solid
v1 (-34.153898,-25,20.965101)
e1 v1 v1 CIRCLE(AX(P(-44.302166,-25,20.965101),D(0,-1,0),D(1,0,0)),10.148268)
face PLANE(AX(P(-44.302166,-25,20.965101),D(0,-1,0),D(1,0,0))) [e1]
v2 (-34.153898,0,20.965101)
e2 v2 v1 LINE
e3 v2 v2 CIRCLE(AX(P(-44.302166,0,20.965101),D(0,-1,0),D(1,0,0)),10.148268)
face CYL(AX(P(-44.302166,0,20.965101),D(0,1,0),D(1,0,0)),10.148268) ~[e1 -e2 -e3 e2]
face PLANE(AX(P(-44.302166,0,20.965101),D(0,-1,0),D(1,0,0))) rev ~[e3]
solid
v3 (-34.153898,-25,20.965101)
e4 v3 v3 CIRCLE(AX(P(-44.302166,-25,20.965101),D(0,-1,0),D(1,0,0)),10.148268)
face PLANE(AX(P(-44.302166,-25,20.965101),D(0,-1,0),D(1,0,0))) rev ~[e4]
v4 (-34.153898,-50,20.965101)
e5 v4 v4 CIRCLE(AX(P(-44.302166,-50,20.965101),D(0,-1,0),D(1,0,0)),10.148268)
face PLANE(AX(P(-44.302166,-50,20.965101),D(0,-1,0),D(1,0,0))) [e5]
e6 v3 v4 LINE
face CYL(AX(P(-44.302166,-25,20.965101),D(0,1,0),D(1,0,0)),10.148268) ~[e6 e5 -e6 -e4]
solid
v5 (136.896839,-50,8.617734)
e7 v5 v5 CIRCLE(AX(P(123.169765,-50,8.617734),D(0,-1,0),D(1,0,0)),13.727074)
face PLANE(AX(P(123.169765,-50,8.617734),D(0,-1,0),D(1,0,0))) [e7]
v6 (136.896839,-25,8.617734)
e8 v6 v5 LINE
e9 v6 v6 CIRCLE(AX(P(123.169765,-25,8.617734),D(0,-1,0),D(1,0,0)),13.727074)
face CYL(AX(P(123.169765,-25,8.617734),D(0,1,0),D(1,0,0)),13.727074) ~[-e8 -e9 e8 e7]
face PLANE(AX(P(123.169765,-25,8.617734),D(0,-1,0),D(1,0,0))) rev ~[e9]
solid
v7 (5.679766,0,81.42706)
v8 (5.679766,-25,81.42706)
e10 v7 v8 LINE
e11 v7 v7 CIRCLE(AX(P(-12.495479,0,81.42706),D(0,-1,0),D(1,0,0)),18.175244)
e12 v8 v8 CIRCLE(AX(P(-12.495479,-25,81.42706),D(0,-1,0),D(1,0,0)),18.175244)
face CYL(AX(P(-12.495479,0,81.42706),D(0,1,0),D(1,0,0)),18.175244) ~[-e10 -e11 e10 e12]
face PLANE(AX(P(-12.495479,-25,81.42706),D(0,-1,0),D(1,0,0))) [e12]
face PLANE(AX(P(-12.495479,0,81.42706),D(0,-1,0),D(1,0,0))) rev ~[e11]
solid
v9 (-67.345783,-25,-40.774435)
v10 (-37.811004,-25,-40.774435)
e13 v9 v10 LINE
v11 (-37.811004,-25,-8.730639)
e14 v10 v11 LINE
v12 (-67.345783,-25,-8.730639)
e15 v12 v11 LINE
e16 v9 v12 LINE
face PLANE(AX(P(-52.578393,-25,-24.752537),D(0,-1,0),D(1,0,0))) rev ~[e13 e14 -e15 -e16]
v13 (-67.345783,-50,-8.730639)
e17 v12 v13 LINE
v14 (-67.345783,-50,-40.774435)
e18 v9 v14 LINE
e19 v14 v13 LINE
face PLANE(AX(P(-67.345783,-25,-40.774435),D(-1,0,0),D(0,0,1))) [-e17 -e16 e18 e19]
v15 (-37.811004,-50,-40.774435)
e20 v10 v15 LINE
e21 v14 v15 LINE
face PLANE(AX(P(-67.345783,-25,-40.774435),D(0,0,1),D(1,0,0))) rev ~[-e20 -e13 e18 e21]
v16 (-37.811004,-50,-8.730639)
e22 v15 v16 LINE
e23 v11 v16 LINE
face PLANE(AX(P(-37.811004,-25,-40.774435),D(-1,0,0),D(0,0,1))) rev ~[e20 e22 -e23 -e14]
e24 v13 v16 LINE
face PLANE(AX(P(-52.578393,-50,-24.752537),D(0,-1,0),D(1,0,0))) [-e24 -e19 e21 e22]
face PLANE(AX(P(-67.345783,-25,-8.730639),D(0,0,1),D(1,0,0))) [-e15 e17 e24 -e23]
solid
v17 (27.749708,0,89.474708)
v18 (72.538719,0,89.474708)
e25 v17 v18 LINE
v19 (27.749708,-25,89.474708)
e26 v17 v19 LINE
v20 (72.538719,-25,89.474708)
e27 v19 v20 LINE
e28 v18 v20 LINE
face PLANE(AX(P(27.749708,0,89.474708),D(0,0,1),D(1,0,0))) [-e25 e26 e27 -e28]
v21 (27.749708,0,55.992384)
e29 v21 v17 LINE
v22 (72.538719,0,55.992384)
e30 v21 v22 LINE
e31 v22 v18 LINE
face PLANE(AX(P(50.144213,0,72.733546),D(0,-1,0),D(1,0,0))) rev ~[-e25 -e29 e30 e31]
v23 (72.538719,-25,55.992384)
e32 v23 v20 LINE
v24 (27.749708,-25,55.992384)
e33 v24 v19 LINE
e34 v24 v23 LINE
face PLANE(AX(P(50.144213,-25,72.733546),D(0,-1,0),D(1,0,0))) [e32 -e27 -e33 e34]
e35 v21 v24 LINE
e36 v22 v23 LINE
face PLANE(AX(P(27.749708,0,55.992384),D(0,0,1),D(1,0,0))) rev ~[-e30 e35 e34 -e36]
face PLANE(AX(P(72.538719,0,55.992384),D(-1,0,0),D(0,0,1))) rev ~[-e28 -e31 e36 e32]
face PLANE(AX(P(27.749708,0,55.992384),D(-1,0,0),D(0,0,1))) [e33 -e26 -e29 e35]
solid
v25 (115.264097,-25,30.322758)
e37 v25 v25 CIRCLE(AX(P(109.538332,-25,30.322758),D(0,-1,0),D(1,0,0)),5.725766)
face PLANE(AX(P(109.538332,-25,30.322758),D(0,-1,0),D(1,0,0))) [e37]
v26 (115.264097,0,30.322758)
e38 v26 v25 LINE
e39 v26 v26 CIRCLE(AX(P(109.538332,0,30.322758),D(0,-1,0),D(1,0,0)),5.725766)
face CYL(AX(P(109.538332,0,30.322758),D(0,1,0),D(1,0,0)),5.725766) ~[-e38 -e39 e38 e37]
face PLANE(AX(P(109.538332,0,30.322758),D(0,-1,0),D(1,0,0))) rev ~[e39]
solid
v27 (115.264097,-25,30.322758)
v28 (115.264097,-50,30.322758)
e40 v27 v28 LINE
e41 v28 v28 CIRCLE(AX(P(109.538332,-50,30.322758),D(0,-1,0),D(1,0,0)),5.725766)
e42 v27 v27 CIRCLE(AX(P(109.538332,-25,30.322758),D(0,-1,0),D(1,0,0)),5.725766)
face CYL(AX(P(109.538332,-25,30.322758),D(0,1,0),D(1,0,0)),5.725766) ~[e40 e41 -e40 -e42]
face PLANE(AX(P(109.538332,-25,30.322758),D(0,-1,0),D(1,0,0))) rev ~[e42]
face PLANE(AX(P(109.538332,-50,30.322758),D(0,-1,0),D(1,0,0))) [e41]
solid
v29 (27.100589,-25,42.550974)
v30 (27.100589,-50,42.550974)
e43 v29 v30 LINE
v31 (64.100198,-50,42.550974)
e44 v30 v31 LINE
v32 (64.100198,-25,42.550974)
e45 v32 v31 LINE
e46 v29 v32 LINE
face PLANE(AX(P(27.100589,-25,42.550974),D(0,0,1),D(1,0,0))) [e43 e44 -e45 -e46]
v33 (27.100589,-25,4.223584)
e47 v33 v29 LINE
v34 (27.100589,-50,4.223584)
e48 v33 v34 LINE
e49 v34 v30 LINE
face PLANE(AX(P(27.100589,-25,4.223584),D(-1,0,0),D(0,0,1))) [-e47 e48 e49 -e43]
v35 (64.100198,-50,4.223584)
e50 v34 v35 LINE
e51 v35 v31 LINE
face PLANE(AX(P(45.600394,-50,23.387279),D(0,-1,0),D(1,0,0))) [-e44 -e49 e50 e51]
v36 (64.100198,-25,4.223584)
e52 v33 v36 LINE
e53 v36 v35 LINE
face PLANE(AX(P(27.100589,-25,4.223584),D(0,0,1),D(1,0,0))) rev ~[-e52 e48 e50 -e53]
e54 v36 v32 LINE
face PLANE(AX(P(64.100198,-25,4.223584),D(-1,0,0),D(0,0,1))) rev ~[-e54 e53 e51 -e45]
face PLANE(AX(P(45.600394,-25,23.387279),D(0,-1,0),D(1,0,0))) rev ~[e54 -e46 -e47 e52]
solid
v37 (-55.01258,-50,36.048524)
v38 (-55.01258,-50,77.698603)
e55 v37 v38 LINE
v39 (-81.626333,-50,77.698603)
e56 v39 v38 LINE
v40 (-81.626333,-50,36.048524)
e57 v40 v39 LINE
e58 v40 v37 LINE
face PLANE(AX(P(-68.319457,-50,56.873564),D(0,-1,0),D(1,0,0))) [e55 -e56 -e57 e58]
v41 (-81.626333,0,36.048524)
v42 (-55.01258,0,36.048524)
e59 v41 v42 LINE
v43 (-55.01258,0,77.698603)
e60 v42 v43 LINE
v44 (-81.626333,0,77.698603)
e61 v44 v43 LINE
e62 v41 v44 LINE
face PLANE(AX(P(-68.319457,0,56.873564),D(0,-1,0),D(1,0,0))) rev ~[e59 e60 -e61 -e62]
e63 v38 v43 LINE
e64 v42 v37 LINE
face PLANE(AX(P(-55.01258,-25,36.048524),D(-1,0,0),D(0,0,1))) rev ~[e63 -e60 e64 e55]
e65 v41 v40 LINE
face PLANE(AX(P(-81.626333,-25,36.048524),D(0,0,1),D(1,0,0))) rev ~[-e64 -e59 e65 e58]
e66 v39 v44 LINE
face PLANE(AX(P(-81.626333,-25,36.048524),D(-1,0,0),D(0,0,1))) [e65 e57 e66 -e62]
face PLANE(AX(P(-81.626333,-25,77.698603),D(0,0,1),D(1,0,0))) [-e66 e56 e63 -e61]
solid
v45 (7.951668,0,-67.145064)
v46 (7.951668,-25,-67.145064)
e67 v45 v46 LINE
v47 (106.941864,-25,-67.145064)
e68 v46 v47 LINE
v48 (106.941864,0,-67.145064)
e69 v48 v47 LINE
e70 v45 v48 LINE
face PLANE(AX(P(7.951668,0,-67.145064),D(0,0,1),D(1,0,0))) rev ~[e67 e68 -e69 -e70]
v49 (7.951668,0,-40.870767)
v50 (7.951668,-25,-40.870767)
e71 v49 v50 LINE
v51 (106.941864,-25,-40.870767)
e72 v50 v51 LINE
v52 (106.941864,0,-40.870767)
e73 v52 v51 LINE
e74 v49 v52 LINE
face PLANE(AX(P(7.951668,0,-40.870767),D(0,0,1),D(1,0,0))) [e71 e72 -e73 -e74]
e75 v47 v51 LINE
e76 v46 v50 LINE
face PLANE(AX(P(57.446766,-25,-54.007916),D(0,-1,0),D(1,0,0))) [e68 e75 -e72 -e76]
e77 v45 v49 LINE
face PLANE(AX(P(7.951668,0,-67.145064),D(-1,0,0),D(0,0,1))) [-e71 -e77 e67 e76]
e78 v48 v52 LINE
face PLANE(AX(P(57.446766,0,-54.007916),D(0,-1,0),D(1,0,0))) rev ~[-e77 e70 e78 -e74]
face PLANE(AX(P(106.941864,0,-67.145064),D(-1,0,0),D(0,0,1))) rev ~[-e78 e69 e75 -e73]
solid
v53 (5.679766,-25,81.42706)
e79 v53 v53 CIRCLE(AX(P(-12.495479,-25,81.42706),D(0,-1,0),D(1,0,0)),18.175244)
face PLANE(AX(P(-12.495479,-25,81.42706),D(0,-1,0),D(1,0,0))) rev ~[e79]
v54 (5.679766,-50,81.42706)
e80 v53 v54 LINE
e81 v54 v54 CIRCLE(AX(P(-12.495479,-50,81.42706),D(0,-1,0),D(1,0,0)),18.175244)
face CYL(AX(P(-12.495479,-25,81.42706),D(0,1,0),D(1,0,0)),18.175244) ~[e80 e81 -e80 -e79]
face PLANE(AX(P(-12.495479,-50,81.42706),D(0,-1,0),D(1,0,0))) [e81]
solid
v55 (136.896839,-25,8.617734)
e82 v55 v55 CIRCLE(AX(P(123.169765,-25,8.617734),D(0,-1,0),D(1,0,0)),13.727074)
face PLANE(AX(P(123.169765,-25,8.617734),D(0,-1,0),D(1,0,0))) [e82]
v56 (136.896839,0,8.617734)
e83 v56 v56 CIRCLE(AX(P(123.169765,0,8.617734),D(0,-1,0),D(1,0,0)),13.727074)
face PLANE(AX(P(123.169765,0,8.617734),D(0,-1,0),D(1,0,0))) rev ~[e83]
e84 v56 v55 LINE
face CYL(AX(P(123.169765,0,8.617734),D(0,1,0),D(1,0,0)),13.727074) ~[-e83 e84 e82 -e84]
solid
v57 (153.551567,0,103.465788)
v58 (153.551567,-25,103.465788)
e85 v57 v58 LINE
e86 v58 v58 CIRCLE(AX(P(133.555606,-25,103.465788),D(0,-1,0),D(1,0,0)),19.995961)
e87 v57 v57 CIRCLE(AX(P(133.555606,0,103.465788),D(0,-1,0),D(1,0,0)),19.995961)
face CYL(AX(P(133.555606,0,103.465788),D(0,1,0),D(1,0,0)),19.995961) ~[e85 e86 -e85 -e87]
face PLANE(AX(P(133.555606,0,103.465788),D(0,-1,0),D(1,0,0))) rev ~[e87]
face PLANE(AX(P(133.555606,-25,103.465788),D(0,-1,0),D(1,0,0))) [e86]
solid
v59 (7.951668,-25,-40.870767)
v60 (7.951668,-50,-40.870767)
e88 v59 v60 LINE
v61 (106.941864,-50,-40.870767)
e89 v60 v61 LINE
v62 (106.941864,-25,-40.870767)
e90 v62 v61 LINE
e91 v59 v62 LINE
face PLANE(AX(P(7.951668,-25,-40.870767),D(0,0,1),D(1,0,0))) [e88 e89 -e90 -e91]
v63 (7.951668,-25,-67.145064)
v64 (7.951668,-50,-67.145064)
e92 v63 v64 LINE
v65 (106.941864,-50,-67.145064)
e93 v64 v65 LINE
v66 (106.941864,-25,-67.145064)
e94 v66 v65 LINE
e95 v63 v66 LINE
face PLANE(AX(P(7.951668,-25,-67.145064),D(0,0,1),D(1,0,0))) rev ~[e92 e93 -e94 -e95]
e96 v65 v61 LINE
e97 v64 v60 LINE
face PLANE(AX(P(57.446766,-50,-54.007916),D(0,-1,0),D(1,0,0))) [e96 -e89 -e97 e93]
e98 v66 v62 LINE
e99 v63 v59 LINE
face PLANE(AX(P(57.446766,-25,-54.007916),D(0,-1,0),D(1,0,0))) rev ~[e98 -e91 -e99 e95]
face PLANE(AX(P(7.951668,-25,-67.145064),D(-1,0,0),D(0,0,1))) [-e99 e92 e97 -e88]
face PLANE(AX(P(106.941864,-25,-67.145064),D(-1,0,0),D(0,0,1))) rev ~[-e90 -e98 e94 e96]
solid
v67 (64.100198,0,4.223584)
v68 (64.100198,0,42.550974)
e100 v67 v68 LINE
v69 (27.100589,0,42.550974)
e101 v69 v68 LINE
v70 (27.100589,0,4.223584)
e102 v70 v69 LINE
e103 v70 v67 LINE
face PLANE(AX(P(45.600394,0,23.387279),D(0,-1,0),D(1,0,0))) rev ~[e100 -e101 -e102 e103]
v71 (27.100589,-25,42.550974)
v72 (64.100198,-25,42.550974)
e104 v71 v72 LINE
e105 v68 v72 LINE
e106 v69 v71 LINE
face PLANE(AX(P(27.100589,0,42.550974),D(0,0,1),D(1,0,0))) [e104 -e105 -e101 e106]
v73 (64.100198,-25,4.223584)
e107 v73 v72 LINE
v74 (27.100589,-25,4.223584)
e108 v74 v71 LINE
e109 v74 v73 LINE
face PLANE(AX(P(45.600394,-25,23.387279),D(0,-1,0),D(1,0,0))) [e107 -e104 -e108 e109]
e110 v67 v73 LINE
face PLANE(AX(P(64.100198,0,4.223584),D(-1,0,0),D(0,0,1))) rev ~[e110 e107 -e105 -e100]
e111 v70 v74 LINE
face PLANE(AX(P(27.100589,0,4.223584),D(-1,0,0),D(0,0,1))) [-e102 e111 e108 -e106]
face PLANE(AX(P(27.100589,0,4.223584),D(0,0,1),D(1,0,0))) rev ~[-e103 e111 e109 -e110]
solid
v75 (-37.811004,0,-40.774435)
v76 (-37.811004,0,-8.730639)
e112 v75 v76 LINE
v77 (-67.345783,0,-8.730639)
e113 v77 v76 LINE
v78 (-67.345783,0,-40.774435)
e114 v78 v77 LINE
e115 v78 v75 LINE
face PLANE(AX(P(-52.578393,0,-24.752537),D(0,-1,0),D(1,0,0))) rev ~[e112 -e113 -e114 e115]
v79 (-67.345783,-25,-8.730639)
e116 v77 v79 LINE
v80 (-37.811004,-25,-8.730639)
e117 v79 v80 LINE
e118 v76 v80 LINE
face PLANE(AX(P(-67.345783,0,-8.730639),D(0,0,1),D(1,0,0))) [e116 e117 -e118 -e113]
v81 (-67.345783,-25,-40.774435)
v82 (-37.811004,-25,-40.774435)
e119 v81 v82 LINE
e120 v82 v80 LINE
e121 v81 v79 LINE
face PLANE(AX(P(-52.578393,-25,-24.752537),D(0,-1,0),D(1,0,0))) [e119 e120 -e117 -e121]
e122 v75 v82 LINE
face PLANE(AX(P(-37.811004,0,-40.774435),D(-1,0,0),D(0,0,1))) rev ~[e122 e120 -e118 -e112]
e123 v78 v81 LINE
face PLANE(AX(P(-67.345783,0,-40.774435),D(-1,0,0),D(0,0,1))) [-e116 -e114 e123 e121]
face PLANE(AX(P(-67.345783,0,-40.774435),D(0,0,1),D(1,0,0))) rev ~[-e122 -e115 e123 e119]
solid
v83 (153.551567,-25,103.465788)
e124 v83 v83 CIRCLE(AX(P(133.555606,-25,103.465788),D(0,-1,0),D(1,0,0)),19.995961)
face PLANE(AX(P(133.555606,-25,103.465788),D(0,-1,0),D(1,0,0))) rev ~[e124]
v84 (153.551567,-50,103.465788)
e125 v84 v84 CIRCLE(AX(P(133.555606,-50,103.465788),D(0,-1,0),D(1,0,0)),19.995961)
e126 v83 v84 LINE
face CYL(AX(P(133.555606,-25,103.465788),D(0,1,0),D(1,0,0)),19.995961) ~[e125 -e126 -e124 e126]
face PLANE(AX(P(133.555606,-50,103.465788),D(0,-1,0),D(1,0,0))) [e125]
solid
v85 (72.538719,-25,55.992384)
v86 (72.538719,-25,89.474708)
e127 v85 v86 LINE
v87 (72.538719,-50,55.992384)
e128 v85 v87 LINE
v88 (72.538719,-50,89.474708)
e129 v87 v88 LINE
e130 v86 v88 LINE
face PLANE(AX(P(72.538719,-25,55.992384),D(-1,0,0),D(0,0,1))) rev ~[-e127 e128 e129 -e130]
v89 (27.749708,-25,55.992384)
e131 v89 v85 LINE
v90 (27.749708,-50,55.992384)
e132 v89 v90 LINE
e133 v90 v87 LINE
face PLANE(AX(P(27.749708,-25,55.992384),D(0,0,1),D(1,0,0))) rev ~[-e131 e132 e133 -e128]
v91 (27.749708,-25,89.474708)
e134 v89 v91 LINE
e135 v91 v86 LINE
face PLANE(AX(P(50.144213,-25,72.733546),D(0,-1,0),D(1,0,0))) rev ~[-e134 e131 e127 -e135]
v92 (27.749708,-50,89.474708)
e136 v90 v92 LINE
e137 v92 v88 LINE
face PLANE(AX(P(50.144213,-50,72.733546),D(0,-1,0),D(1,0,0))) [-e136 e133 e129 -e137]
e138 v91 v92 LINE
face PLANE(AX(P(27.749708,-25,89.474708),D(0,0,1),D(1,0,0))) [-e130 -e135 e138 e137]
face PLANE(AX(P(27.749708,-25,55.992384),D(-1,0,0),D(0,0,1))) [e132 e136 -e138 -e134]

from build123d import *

# Parameters (mm, degrees)
F0_W     = 26.613753289
F0_H     = 41.6500791907
F1_DEPTH = 25
F0_W_2   = 44.7890106589
F0_H_2   = 33.482324332
F0_W_3   = 36.9996093214
F0_H_3   = 38.3273893967
F0_W_4   = 29.534779489
F0_H_4   = 32.0437960327
F0_W_5   = 98.9901963621
F0_H_5   = 26.2742973864
F0_R     = 18.1752443314
F0_R_2   = 10.148267962
F0_R_3   = 5.7257656008
F0_R_4   = 13.7270743948
F0_R_5   = 19.9959609748
F2_DEPTH = 25


with BuildPart() as f1:
    # F0 (on Front) → F1 (new body)
    with BuildSketch(Plane.XZ):
        with Locations((-68.3194566518, 56.8735636771)):
            Rectangle(F0_W, F0_H)
    extrude(amount=F1_DEPTH)

    # F2 (add): a face of the model
    f2_faces = [f1.faces().sort_by_distance(p)[0] for p in [
        (-68.3194566518, -25, 56.8735636771),
    ]]
    extrude(f2_faces, amount=F2_DEPTH)


with BuildPart() as f1b:
    # F0 (on Front) → F1, piece 2 (new body)
    with BuildSketch(Plane.XZ):
        with Locations((50.1442132518, 72.7335456759)):
            Rectangle(F0_W_2, F0_H_2)
    extrude(amount=F1_DEPTH)


with BuildPart() as f1c:
    # F0 (on Front) → F1, piece 3 (new body)
    with BuildSketch(Plane.XZ):
        with Locations((45.600393787, 23.3872788958)):
            Rectangle(F0_W_3, F0_H_3)
    extrude(amount=F1_DEPTH)


with BuildPart() as f1d:
    # F0 (on Front) → F1, piece 4 (new body)
    with BuildSketch(Plane.XZ):
        with Locations((-52.5783933699, -24.7525367886)):
            Rectangle(F0_W_4, F0_H_4)
    extrude(amount=F1_DEPTH)


with BuildPart() as f1e:
    # F0 (on Front) → F1, piece 5 (new body)
    with BuildSketch(Plane.XZ):
        with Locations((57.4467657134, -54.0079157799)):
            Rectangle(F0_W_5, F0_H_5)
    extrude(amount=F1_DEPTH)


with BuildPart() as f1f:
    # F0 (on Front) → F1, piece 6 (new body)
    with BuildSketch(Plane.XZ):
        with Locations((-12.4954786152, 81.4270600677)):
            Circle(F0_R)
    extrude(amount=F1_DEPTH)


with BuildPart() as f1g:
    # F0 (on Front) → F1, piece 7 (new body)
    with BuildSketch(Plane.XZ):
        with Locations((-44.3021655083, 20.9651011974)):
            Circle(F0_R_2)
    extrude(amount=F1_DEPTH)


with BuildPart() as f1h:
    # F0 (on Front) → F1, piece 8 (new body)
    with BuildSketch(Plane.XZ):
        with Locations((109.5383316278, 30.3227584809)):
            Circle(F0_R_3)
    extrude(amount=F1_DEPTH)


with BuildPart() as f1i:
    # F0 (on Front) → F1, piece 9 (new body)
    with BuildSketch(Plane.XZ):
        with Locations((123.1697648764, 8.6177336052)):
            Circle(F0_R_4)
    extrude(amount=F1_DEPTH)


with BuildPart() as f1j:
    # F0 (on Front) → F1, piece 10 (new body)
    with BuildSketch(Plane.XZ):
        with Locations((133.5556060076, 103.4657880664)):
            Circle(F0_R_5)
    extrude(amount=F1_DEPTH)


with BuildPart() as f2:
    # F2#2 (new): a face of the model
    f2_2_faces = [f1b.part.faces().sort_by_distance(p)[0] for p in [
        (50.1442132518, -25, 72.7335456759),
    ]]
    extrude(f2_2_faces, amount=F2_DEPTH)


with BuildPart() as f2b:
    # F2#3 (new): a face of the model
    f2_3_faces = [f1f.part.faces().sort_by_distance(p)[0] for p in [
        (-12.4954786152, -25, 81.4270600677),
    ]]
    extrude(f2_3_faces, amount=F2_DEPTH)


with BuildPart() as f2c:
    # F2#4 (new): a face of the model
    f2_4_faces = [f1g.part.faces().sort_by_distance(p)[0] for p in [
        (-44.3021655083, -25, 20.9651011974),
    ]]
    extrude(f2_4_faces, amount=F2_DEPTH)


with BuildPart() as f2d:
    # F2#5 (new): a face of the model
    f2_5_faces = [f1d.part.faces().sort_by_distance(p)[0] for p in [
        (-52.5783933699, -25, -24.7525367886),
    ]]
    extrude(f2_5_faces, amount=F2_DEPTH)


with BuildPart() as f2e:
    # F2#6 (new): a face of the model
    f2_6_faces = [f1e.part.faces().sort_by_distance(p)[0] for p in [
        (57.4467657134, -25, -54.0079157799),
    ]]
    extrude(f2_6_faces, amount=F2_DEPTH)


with BuildPart() as f2f:
    # F2#7 (new): a face of the model
    f2_7_faces = [f1i.part.faces().sort_by_distance(p)[0] for p in [
        (123.1697648764, -25, 8.6177336052),
    ]]
    extrude(f2_7_faces, amount=F2_DEPTH)


with BuildPart() as f2g:
    # F2#8 (new): a face of the model
    f2_8_faces = [f1c.part.faces().sort_by_distance(p)[0] for p in [
        (45.600393787, -25, 23.3872788958),
    ]]
    extrude(f2_8_faces, amount=F2_DEPTH)


with BuildPart() as f2h:
    # F2#9 (new): a face of the model
    f2_9_faces = [f1h.part.faces().sort_by_distance(p)[0] for p in [
        (109.5383316278, -25, 30.3227584809),
    ]]
    extrude(f2_9_faces, amount=F2_DEPTH)


with BuildPart() as f2i:
    # F2#10 (new): a face of the model
    f2_10_faces = [f1j.part.faces().sort_by_distance(p)[0] for p in [
        (133.5556060076, -25, 103.4657880664),
    ]]
    extrude(f2_10_faces, amount=F2_DEPTH)


solid = Compound([f1.part, f1b.part, f1c.part, f1d.part, f1e.part, f1f.part, f1g.part, f1h.part, f1i.part, f1j.part, f2.part, f2b.part, f2c.part, f2d.part, f2e.part, f2f.part, f2g.part, f2h.part, f2i.part])
